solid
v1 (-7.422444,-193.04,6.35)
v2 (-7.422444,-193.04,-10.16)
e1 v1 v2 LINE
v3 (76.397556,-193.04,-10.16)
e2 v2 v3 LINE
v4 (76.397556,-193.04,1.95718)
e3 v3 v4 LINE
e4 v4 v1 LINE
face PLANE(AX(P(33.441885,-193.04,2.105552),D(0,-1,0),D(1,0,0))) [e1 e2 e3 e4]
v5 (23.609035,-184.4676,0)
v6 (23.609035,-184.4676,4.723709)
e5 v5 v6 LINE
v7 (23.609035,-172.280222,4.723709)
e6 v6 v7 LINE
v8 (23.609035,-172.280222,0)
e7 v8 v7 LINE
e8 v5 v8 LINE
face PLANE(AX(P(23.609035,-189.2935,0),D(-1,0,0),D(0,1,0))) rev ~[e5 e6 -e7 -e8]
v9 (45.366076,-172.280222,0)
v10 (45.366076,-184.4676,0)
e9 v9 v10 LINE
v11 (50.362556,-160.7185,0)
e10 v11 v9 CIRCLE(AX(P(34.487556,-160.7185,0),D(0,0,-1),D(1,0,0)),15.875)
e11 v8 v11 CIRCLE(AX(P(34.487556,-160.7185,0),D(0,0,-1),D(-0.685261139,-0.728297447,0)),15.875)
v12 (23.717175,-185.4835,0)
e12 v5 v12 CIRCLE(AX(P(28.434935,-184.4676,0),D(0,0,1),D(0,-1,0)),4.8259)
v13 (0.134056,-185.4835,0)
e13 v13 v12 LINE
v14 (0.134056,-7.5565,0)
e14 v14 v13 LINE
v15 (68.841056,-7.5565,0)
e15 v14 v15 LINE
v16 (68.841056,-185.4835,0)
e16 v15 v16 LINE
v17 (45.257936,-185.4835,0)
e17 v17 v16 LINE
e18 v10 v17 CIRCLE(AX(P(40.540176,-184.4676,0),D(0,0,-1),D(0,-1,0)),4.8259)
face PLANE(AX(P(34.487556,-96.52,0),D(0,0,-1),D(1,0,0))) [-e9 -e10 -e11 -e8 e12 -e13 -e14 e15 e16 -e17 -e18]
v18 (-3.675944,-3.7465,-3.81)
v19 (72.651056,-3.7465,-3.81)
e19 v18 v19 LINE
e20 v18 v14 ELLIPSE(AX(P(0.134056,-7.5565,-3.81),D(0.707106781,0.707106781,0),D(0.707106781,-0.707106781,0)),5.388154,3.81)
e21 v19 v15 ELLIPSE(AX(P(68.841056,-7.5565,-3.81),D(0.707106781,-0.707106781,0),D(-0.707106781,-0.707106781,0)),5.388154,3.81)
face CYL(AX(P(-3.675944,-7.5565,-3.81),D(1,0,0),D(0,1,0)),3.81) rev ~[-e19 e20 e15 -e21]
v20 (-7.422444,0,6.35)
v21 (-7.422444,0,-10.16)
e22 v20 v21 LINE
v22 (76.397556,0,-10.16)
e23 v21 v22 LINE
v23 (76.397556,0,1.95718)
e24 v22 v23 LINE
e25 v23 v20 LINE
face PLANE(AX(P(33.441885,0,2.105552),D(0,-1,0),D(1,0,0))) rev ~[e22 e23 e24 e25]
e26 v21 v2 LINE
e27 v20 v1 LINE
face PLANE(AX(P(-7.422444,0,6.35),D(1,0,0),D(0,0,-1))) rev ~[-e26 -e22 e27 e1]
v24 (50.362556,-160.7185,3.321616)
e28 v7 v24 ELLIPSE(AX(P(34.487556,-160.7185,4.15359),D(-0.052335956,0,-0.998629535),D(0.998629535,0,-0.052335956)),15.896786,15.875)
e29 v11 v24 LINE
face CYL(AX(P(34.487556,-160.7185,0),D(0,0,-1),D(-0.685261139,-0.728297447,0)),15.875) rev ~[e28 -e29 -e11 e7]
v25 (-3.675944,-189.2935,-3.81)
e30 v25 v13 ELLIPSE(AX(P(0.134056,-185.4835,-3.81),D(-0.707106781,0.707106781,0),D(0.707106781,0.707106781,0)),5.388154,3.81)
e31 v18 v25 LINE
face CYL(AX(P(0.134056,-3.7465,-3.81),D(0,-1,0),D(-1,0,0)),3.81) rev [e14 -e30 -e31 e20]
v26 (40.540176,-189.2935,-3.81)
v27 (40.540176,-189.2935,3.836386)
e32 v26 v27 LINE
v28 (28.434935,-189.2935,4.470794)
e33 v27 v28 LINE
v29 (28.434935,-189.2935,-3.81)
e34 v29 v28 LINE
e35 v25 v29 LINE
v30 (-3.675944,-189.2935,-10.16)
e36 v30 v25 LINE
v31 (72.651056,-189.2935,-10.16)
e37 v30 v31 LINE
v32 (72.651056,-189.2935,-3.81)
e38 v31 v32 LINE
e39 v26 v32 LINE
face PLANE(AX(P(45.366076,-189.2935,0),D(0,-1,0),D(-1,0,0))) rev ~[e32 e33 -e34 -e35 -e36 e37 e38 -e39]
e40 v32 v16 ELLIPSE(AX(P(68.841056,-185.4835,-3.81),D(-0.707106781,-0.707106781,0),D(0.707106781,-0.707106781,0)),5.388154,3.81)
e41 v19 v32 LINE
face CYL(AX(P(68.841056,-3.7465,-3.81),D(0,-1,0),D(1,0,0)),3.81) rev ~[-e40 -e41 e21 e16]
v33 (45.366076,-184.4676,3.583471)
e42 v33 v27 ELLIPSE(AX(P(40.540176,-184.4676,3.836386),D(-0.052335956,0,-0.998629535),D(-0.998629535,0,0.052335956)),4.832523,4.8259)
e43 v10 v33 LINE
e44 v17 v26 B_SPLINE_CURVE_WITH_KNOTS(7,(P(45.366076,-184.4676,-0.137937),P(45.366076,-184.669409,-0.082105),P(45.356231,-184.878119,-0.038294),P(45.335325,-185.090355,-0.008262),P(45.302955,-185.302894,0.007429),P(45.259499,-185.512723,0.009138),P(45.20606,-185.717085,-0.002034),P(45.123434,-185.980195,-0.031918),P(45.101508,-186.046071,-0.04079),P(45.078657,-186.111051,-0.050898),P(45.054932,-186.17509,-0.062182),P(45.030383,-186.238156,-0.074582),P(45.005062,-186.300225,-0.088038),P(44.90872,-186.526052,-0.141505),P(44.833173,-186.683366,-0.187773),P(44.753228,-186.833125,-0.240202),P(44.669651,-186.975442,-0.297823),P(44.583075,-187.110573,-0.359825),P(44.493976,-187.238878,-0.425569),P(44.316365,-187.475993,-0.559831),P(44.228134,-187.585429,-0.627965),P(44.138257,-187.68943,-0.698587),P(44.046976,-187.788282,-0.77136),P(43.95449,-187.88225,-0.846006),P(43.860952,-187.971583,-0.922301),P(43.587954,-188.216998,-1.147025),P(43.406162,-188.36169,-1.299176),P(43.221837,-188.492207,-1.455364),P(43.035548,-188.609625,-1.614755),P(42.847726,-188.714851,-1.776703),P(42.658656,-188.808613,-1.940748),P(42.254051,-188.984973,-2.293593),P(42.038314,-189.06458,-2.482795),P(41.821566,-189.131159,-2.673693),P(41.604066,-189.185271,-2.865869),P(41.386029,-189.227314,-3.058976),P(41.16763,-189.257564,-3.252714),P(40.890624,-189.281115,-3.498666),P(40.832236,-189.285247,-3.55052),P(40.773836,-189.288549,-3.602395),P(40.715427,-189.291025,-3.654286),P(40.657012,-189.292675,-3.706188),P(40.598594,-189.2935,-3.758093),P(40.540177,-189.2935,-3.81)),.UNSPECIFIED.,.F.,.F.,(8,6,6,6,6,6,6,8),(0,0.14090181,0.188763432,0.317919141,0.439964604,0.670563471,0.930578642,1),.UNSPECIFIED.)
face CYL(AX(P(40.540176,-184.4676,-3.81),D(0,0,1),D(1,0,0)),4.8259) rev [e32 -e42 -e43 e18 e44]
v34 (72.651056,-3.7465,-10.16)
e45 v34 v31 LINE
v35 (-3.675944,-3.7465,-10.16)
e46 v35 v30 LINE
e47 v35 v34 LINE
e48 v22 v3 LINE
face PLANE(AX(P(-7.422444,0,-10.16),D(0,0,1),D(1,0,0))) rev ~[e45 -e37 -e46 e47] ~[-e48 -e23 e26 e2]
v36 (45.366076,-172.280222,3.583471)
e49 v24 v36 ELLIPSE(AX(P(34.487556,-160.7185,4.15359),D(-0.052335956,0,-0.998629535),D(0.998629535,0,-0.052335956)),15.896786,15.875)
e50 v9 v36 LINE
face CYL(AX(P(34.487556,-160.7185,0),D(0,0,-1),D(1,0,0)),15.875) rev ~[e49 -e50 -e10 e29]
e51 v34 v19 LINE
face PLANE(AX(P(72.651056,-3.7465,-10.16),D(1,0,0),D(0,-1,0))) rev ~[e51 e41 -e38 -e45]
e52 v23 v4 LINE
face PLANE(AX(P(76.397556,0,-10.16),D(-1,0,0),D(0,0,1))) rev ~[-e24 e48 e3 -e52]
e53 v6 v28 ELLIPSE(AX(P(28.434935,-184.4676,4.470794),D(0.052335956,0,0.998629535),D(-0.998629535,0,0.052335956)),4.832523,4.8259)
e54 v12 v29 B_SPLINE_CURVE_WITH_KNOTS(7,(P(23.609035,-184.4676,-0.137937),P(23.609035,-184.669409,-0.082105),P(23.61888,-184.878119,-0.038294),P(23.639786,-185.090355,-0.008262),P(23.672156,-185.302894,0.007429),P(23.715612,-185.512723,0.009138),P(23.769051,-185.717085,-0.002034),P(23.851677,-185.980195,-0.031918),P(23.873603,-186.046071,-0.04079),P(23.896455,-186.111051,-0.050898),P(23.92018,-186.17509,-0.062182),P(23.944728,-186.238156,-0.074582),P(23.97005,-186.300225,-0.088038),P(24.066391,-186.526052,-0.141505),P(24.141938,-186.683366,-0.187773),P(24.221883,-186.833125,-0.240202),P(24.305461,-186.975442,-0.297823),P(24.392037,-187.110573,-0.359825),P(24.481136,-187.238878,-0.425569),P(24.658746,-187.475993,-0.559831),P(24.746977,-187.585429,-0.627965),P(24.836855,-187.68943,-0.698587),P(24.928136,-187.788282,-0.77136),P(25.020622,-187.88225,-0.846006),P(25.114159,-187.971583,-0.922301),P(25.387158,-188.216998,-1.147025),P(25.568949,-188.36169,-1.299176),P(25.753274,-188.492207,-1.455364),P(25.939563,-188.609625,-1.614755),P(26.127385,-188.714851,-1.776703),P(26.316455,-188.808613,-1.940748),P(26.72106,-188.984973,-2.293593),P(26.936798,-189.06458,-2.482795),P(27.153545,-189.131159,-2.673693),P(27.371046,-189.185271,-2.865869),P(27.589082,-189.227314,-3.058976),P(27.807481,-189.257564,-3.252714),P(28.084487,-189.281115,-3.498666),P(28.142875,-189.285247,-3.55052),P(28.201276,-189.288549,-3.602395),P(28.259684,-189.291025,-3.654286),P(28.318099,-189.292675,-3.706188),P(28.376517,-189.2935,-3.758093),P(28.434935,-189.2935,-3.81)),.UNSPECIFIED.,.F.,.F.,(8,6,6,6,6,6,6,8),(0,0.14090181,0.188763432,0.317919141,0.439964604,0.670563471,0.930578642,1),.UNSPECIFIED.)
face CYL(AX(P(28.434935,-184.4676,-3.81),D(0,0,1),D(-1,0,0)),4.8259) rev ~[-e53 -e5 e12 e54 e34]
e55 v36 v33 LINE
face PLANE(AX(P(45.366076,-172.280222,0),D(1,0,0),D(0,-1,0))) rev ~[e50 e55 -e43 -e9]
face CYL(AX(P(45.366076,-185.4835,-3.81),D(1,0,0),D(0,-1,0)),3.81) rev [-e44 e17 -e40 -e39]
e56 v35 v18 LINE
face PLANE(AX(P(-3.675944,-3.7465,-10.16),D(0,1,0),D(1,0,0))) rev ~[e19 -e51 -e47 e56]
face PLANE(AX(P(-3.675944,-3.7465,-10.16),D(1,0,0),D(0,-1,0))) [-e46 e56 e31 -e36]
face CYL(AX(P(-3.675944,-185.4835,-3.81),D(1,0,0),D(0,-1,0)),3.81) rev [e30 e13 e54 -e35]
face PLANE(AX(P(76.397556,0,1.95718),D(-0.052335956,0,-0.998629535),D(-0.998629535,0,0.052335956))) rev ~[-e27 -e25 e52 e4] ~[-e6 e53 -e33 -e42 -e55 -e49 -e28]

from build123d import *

# Parameters (mm, degrees)
F0_W     = 83.82
F0_H     = 10.16
F1_DEPTH = 193.04
F2_W     = 76.327
F2_H     = 185.547
F3_DEPTH = 10.16
F5_DEPTH = 25.4
F6_R     = 3.81
F7_R     = 4.8259


# Not quite as in the source:
# - a fillet or chamfer is up to 0.001 mm smaller than in the source, because OpenCascade refuses the exact size


with BuildPart() as f1:
    # F0 (on Front) → F1 (new body)
    with BuildSketch(Plane.XZ):
        Polygon((-7.4224442948, 6.35), (-7.4224442948, 0), (76.3975557052, 0), (76.3975557052, 1.9571799405), align=None)
        with Locations((34.4875557052, -5.08)):
            Rectangle(F0_W, F0_H)
    extrude(amount=F1_DEPTH)

    # F2 (on face) → F3 (cut)
    with BuildSketch(Plane(origin=(0, 0, -10.16), x_dir=(1, 0, 0), z_dir=(0, 0, -1))):
        with Locations((34.4875557052, 96.52)):
            Rectangle(F2_W, F2_H)
    extrude(amount=-F3_DEPTH, mode=Mode.SUBTRACT)

    # F4 (on face) → F5 (cut)
    with BuildSketch(Plane(origin=(0, 0, 0), x_dir=(1, 0, 0), z_dir=(0, 0, -1))):
        with BuildLine():
            ThreePointArc((23.6090351158, 172.2802219646), (28.189972413, 146.1460578684), (50.3625557052, 160.7185))
            ThreePointArc((50.3625557052, 160.7185), (49.0599978368, 167.0160832922), (45.3660762946, 172.2802219646))
            ThreePointArc((45.3660762946, 172.2802219646), (34.4875557052, 176.5935), (23.6090351158, 172.2802219646))
        make_face()
        with BuildLine():
            ThreePointArc((23.6090351158, 172.2802219646), (34.4875557052, 176.5935), (45.3660762946, 172.2802219646))
            Line((45.3660762946, 172.2802219646), (45.3660762946, 189.2935))
            Line((45.3660762946, 189.2935), (23.6090351158, 189.2935))
            Line((23.6090351158, 189.2935), (23.6090351158, 172.2802219646))
        make_face()
    extrude(amount=-F5_DEPTH, mode=Mode.SUBTRACT)

    # F6
    f6_edges = [f1.edges().sort_by_distance(p)[0] for p in [
        (59.008566, -189.2935, 0),
        (9.966545, -189.2935, 0),
        (-3.675944, -96.52, 0),
        (72.651056, -96.52, 0),
        (34.487556, -3.7465, 0),
    ]]
    fillet(f6_edges, radius=F6_R)

    # F7 (radius 4.826 in the source; OpenCascade refuses exactly that, so slightly less here)
    f7_edges = [f1.edges().sort_by_distance(p)[0] for p in [
        (45.366076, -189.2935, 1.791735),
        (23.609035, -189.2935, 2.361855),
    ]]
    fillet(f7_edges, radius=F7_R)


solid = f1.part
